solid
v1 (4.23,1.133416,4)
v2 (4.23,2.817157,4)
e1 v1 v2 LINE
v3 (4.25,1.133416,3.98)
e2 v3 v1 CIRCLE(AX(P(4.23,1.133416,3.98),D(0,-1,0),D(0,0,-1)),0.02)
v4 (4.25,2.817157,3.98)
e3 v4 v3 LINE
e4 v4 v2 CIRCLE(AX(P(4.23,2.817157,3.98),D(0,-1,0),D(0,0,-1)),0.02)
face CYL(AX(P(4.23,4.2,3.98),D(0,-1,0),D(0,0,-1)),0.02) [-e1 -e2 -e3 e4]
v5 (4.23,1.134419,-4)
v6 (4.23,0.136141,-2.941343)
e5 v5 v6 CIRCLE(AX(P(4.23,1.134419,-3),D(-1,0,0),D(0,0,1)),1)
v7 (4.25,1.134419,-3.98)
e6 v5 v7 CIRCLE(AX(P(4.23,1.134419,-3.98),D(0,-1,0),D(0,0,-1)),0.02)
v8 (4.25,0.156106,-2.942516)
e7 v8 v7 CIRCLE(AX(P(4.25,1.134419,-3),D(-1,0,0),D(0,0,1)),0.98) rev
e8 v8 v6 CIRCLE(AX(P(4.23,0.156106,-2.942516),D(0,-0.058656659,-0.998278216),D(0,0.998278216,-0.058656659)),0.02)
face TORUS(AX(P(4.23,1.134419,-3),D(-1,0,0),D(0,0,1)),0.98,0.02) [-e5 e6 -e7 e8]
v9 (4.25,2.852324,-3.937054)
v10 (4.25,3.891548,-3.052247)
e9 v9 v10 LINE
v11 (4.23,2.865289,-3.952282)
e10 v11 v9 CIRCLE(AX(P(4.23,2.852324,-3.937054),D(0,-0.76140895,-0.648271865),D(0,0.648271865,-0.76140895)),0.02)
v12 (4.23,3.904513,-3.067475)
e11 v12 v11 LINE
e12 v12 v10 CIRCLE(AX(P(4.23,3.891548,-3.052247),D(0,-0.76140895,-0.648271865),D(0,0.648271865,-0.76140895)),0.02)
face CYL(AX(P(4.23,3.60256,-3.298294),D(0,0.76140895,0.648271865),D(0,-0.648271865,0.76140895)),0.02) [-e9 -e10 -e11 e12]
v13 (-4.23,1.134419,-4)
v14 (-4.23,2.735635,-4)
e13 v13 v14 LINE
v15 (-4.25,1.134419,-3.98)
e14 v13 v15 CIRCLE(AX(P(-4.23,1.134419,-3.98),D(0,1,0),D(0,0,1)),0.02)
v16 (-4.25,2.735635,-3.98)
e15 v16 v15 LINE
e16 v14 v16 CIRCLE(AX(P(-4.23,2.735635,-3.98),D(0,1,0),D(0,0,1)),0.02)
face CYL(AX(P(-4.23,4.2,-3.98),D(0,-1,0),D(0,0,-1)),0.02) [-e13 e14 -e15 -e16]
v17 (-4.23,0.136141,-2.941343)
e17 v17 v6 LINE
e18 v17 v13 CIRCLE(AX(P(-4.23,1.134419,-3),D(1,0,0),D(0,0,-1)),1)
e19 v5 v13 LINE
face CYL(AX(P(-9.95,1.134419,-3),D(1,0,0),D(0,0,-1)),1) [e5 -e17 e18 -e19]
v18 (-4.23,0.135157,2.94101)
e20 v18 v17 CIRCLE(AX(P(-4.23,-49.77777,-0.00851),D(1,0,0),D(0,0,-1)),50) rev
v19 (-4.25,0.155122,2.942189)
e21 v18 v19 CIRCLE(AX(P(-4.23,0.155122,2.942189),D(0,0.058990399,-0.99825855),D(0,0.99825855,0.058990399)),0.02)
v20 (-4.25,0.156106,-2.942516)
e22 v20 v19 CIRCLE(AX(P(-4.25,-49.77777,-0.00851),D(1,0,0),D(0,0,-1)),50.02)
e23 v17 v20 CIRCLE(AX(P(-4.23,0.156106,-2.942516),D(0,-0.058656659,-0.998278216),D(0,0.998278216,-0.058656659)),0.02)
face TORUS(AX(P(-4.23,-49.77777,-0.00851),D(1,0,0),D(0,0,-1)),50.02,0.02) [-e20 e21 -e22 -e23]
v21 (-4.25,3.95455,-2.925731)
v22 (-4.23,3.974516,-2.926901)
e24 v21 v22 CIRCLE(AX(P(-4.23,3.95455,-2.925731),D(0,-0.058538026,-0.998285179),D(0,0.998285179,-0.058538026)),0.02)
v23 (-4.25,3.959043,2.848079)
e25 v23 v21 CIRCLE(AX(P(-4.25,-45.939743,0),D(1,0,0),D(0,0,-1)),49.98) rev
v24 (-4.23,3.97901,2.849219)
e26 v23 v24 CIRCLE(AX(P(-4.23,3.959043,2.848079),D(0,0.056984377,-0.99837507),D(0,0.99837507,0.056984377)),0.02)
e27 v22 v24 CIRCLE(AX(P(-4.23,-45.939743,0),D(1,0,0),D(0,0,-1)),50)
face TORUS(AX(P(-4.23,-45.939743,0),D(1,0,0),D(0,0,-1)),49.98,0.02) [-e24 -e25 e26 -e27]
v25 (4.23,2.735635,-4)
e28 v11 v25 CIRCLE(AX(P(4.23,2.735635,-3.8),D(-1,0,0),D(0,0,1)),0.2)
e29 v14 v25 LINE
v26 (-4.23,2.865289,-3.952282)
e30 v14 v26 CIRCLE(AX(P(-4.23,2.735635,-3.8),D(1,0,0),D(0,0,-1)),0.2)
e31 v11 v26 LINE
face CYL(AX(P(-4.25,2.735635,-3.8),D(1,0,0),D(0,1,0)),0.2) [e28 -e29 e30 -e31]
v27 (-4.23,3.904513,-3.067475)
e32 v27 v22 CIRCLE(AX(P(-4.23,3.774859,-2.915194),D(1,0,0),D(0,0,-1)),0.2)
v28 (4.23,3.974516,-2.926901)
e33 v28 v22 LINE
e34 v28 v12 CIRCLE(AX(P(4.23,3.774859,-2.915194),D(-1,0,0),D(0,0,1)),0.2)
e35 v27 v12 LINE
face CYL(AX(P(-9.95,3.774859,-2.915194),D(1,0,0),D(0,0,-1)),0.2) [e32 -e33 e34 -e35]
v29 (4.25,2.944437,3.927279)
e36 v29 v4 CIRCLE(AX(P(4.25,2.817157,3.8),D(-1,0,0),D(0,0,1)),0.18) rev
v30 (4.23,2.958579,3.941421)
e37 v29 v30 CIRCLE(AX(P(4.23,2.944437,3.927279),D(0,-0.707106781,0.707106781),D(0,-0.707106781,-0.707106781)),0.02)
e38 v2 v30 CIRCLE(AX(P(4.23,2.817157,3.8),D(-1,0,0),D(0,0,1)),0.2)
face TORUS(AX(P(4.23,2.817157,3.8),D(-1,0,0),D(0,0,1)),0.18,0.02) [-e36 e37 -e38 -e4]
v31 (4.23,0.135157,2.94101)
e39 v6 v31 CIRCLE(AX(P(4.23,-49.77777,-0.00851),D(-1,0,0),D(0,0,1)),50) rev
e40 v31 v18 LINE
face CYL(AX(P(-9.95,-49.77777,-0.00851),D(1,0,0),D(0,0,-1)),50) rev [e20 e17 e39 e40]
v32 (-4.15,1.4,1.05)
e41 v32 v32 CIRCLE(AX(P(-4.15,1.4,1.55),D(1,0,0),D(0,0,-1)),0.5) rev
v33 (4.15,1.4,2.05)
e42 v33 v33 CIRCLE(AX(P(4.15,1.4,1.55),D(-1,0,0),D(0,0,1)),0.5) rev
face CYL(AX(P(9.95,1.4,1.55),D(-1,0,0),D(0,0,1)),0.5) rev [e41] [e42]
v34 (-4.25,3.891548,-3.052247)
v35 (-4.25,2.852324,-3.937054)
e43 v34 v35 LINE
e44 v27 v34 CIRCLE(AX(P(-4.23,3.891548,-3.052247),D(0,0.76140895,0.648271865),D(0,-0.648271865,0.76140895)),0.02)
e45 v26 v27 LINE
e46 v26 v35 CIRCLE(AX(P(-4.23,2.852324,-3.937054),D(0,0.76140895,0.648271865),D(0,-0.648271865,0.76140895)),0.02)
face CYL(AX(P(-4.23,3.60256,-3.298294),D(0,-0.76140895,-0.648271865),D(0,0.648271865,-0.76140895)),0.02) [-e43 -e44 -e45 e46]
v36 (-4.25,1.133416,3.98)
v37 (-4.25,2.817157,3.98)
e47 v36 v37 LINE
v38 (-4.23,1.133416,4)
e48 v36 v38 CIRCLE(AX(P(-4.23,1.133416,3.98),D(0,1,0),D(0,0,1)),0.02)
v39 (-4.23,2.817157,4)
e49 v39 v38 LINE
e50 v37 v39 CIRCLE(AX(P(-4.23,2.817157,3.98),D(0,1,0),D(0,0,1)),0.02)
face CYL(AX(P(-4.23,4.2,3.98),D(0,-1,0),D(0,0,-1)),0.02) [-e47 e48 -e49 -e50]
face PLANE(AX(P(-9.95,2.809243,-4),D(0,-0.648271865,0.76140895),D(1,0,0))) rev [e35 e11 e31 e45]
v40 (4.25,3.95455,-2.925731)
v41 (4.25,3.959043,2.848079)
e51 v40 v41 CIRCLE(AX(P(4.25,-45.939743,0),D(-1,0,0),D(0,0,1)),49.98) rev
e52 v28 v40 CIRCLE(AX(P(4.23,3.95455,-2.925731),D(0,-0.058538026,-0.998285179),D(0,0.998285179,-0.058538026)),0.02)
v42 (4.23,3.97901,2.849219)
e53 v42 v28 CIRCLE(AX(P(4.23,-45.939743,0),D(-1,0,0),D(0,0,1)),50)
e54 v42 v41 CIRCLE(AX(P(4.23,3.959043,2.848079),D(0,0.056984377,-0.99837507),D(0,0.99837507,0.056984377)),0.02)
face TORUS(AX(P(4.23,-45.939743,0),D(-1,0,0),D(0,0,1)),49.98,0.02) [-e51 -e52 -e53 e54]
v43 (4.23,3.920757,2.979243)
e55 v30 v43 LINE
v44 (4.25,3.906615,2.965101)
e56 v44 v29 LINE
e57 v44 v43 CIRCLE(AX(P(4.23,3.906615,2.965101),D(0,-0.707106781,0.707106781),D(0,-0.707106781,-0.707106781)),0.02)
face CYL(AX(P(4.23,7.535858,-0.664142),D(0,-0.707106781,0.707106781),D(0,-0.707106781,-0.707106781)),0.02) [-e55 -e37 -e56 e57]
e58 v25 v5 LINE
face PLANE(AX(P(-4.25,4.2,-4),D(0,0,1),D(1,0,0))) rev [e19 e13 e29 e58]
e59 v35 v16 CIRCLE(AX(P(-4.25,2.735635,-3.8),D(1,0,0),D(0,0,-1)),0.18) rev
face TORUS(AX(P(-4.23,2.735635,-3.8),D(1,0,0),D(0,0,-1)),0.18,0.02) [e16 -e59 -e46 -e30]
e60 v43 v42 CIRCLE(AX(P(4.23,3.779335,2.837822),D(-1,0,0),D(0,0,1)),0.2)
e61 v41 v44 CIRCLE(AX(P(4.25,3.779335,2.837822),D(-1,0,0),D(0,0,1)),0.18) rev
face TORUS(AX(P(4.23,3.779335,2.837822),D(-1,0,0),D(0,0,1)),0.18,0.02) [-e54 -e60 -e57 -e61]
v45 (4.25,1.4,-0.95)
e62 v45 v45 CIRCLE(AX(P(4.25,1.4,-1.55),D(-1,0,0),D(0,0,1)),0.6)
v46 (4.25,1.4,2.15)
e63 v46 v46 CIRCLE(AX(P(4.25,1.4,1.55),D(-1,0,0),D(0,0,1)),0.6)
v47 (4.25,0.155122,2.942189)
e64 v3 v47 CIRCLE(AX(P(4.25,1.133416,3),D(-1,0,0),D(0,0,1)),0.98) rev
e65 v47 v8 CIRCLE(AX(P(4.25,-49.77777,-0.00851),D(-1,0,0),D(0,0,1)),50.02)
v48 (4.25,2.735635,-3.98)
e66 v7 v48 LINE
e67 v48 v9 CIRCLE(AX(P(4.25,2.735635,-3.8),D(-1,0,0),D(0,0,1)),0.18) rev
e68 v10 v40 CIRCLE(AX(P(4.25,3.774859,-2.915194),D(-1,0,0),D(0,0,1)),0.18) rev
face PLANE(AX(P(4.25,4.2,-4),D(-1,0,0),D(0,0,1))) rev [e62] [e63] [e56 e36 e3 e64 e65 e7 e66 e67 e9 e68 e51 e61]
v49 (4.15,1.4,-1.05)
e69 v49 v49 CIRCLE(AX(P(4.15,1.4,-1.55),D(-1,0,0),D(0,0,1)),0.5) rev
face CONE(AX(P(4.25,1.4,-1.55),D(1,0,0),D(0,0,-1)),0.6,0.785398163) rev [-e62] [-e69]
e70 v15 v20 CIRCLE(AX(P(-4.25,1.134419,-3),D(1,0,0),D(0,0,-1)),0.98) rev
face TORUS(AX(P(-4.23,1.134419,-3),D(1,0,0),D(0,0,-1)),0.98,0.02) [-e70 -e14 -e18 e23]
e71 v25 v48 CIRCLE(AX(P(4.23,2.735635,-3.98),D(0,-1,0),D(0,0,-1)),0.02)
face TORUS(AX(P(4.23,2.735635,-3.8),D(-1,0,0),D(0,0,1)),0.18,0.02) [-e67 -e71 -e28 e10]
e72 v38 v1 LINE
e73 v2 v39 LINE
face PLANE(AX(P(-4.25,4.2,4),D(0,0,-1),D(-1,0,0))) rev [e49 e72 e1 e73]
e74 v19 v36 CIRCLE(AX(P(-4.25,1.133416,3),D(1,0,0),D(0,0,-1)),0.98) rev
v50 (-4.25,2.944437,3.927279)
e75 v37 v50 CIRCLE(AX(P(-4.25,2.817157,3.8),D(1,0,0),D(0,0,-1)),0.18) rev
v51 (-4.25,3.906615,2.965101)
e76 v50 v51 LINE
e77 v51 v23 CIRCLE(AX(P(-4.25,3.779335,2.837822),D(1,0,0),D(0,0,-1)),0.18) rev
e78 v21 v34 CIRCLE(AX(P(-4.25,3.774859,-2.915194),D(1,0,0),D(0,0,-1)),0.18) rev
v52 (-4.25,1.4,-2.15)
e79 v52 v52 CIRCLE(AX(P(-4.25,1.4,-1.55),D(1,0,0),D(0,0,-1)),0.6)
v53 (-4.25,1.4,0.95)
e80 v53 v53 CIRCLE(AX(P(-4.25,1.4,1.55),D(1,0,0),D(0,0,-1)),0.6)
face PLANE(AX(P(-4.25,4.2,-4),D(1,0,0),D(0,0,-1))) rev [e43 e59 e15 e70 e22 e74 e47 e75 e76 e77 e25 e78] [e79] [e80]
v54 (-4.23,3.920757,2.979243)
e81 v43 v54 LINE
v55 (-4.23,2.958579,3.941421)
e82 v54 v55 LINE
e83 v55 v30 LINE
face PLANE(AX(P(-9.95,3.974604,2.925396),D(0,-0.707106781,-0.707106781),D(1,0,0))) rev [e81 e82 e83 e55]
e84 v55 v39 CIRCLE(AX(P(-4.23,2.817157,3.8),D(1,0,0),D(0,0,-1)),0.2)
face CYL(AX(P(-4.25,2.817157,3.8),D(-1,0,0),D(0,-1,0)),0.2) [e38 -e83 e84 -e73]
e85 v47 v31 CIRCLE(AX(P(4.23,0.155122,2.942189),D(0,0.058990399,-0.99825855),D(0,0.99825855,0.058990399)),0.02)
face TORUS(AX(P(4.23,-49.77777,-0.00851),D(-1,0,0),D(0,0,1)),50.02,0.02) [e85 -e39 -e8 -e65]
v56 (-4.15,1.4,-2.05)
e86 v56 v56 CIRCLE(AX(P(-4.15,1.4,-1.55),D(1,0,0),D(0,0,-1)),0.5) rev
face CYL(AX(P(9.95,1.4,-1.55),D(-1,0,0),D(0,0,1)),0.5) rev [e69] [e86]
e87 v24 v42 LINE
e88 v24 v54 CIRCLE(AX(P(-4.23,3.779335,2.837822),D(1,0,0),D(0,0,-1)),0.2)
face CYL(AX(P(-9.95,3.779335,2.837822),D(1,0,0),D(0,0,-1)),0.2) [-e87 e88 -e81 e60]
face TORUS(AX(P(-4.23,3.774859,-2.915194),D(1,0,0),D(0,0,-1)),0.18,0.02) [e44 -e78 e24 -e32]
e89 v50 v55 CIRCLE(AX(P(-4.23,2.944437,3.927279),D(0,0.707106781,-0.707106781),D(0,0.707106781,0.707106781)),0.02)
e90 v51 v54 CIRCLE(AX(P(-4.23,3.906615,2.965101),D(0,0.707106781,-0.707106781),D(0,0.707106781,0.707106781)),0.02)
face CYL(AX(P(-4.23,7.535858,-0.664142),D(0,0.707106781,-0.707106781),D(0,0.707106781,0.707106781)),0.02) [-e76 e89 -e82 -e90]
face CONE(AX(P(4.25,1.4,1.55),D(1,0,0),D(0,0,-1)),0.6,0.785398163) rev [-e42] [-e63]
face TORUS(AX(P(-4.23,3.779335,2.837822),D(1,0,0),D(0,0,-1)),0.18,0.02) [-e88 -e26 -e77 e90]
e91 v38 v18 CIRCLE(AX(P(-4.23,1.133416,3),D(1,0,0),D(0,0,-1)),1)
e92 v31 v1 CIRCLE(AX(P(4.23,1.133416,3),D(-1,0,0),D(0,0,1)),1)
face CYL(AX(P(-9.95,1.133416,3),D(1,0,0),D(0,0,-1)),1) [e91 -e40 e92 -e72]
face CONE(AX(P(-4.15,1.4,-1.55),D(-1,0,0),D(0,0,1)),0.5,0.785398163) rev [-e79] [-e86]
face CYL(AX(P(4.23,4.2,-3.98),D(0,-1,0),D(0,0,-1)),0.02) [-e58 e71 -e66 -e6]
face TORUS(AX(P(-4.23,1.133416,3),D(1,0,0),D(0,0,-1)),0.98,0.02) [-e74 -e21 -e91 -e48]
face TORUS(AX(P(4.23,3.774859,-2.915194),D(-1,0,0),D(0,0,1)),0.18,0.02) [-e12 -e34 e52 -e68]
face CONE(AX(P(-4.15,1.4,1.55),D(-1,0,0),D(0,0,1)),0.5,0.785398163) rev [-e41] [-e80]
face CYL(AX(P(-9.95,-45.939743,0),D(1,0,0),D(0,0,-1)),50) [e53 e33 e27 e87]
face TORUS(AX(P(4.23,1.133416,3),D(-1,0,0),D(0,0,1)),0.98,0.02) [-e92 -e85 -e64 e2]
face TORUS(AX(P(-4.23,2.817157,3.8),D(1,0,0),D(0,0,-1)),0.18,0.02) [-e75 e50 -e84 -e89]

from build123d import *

# Parameters (mm, degrees)
SKETCH1_W           = 8.5
SKETCH1_H           = 8
BOSS_EXTRUDE1_DEPTH = 4.2
CUT_EXTRUDE1_DEPTH  = 14.2
CHAMFER1_SIZE       = 1.090756547
CHAMFER1_SIZE_2     = 1
FILLET1_R           = 1
FILLET2_R           = 0.2
FILLET3_R           = 0.02
SKETCH3_R           = 0.5
CUT_EXTRUDE2_DEPTH  = 14.2
CHAMFER2_SIZE       = 0.1


with BuildPart() as part:
    # Sketch1 → Boss-Extrude1 (new body)
    with BuildSketch(Plane(origin=(0, 0, 0), x_dir=(1, 0, 0), z_dir=(0, 1, 0))):
        Rectangle(SKETCH1_W, SKETCH1_H)
    extrude(amount=BOSS_EXTRUDE1_DEPTH)

    # Sketch2 → Cut-Extrude1 (cut)
    with BuildSketch(Plane(origin=(4.25, 0, 0), x_dir=(0, 0, -1), z_dir=(1, 0, 0))):
        with BuildLine():
            Line((-4, 3.9), (-5.253535024, 5.241651662))
            Line((-5.253535024, 5.241651662), (3.889156526, 7.141243929))
            Line((3.889156526, 7.141243929), (5.679183493, 5.077233243))
            Line((5.679183493, 5.077233243), (4, 3.9))
            ThreePointArc((4, 3.9), (0, 4.060256822), (-4, 3.9))
        make_face()
        with BuildLine():
            Line((4.717394395, 0), (0, -2.904825783))
            Line((0, -2.904825783), (-4.70037365, 0))
            ThreePointArc((-4.70037365, 0), (0.008510373, 0.222229748), (4.717394395, 0))
        make_face()
    extrude(amount=-CUT_EXTRUDE1_DEPTH, mode=Mode.SUBTRACT)

    # Chamfer1
    # the kernel refuses this chamfer: 1.090756547, 1 mm, written as the material it takes off along each edge
    with BuildSketch(Plane(origin=(7.060832105, 3.9, -4), x_dir=(0, -1, 0), z_dir=(-1, 0, 0))) as chamfer1_piece_1:
        with BuildLine():
            Line((CHAMFER1_SIZE, 0), (-0.069441157, 0.98780495))
            ThreePointArc((-0.069441157, 0.98780495), (-0.038234412, 0.508961249), (0, 0))
            Line((0, 0), (CHAMFER1_SIZE, 0))
        make_face()
    extrude(amount=14.12166421, mode=Mode.SUBTRACT)
    with BuildSketch(Plane(origin=(7.026184696, 3.9, 4), x_dir=(0, 0.06925797782051132, -0.9975987833333668), z_dir=(-1, 0, 0))) as chamfer1_piece_2:
        with BuildLine():
            Line((1.077190612, 0), (-CHAMFER1_SIZE_2 * 0.0692579778205, CHAMFER1_SIZE_2 * 0.997598783333))
            Line((-CHAMFER1_SIZE_2 * 0.0692579778205, CHAMFER1_SIZE_2 * 0.997598783333), (0, 0))
            ThreePointArc((0, 0), (0.555048482, -0.002898226), (1.077190612, 0))
        make_face()
    extrude(amount=14.052369392, mode=Mode.SUBTRACT)

    # Fillet1
    fillet1_edges = [part.edges().sort_by_distance(p)[0] for p in [
        (0, 0.062655213, -4),
        (0, 0.061289175, 4),
    ]]
    fillet(fillet1_edges, radius=FILLET1_R)

    # Fillet2
    fillet2_edges = [part.edges().sort_by_distance(p)[0] for p in [
        (0, 2.809243453, -4),
        (0, 3.974604043, 2.925395957),
        (0, 3.969441157, -3.01219505),
        (0, 2.9, 4),
    ]]
    fillet(fillet2_edges, radius=FILLET2_R)

    # Fillet3
    fillet3_edges = [part.edges().sort_by_distance(p)[0] for p in [
        (4.25, 0.222229049, -0.000152397),
        (4.25, 0.406869221, -3.686055151),
        (4.25, 0.405751593, 3.685933525),
        (-4.25, 0.222229049, -0.000152397),
        (-4.25, 0.406869221, -3.686055151),
        (-4.25, 0.405751593, 3.685933525),
        (4.25, 1.93502694, -4),
        (-4.25, 1.93502694, -4),
        (4.25, 1.975286544, 4),
        (4.25, 3.384901314, -3.509878633),
        (4.25, 4.060241686, -0.03890618),
        (4.25, 3.439667659, 3.460332341),
        (4.25, 2.893693974, 3.984775907),
        (4.25, 3.961854563, 2.919594368),
        (4.25, 3.953888859, -3.004346497),
        (4.25, 2.804713491, -3.987691713),
        (-4.25, 3.384901314, -3.509878633),
        (-4.25, 1.975286544, 4),
        (-4.25, 3.439667659, 3.460332341),
        (-4.25, 4.060241686, -0.03890618),
        (-4.25, 2.893693974, 3.984775907),
        (-4.25, 3.961854563, 2.919594368),
        (-4.25, 3.953888859, -3.004346497),
        (-4.25, 2.804713491, -3.987691713),
    ]]
    fillet(fillet3_edges, radius=FILLET3_R)

    # Sketch3 → Cut-Extrude2 (cut)
    with BuildSketch(Plane.ZY.offset(4.25)):
        with Locations((-1.55, 1.4)):
            Circle(SKETCH3_R)
        with Locations((1.55, 1.4)):
            Circle(SKETCH3_R)
    extrude(amount=-CUT_EXTRUDE2_DEPTH, mode=Mode.SUBTRACT)

    # Chamfer2
    chamfer2_edges = [part.edges().sort_by_distance(p)[0] for p in [
        (4.25, 1.4, -2.05),
        (-4.25, 1.4, -2.05),
        (4.25, 1.4, 1.05),
        (-4.25, 1.4, 1.05),
    ]]
    chamfer(chamfer2_edges, length=CHAMFER2_SIZE)


solid = part.part
